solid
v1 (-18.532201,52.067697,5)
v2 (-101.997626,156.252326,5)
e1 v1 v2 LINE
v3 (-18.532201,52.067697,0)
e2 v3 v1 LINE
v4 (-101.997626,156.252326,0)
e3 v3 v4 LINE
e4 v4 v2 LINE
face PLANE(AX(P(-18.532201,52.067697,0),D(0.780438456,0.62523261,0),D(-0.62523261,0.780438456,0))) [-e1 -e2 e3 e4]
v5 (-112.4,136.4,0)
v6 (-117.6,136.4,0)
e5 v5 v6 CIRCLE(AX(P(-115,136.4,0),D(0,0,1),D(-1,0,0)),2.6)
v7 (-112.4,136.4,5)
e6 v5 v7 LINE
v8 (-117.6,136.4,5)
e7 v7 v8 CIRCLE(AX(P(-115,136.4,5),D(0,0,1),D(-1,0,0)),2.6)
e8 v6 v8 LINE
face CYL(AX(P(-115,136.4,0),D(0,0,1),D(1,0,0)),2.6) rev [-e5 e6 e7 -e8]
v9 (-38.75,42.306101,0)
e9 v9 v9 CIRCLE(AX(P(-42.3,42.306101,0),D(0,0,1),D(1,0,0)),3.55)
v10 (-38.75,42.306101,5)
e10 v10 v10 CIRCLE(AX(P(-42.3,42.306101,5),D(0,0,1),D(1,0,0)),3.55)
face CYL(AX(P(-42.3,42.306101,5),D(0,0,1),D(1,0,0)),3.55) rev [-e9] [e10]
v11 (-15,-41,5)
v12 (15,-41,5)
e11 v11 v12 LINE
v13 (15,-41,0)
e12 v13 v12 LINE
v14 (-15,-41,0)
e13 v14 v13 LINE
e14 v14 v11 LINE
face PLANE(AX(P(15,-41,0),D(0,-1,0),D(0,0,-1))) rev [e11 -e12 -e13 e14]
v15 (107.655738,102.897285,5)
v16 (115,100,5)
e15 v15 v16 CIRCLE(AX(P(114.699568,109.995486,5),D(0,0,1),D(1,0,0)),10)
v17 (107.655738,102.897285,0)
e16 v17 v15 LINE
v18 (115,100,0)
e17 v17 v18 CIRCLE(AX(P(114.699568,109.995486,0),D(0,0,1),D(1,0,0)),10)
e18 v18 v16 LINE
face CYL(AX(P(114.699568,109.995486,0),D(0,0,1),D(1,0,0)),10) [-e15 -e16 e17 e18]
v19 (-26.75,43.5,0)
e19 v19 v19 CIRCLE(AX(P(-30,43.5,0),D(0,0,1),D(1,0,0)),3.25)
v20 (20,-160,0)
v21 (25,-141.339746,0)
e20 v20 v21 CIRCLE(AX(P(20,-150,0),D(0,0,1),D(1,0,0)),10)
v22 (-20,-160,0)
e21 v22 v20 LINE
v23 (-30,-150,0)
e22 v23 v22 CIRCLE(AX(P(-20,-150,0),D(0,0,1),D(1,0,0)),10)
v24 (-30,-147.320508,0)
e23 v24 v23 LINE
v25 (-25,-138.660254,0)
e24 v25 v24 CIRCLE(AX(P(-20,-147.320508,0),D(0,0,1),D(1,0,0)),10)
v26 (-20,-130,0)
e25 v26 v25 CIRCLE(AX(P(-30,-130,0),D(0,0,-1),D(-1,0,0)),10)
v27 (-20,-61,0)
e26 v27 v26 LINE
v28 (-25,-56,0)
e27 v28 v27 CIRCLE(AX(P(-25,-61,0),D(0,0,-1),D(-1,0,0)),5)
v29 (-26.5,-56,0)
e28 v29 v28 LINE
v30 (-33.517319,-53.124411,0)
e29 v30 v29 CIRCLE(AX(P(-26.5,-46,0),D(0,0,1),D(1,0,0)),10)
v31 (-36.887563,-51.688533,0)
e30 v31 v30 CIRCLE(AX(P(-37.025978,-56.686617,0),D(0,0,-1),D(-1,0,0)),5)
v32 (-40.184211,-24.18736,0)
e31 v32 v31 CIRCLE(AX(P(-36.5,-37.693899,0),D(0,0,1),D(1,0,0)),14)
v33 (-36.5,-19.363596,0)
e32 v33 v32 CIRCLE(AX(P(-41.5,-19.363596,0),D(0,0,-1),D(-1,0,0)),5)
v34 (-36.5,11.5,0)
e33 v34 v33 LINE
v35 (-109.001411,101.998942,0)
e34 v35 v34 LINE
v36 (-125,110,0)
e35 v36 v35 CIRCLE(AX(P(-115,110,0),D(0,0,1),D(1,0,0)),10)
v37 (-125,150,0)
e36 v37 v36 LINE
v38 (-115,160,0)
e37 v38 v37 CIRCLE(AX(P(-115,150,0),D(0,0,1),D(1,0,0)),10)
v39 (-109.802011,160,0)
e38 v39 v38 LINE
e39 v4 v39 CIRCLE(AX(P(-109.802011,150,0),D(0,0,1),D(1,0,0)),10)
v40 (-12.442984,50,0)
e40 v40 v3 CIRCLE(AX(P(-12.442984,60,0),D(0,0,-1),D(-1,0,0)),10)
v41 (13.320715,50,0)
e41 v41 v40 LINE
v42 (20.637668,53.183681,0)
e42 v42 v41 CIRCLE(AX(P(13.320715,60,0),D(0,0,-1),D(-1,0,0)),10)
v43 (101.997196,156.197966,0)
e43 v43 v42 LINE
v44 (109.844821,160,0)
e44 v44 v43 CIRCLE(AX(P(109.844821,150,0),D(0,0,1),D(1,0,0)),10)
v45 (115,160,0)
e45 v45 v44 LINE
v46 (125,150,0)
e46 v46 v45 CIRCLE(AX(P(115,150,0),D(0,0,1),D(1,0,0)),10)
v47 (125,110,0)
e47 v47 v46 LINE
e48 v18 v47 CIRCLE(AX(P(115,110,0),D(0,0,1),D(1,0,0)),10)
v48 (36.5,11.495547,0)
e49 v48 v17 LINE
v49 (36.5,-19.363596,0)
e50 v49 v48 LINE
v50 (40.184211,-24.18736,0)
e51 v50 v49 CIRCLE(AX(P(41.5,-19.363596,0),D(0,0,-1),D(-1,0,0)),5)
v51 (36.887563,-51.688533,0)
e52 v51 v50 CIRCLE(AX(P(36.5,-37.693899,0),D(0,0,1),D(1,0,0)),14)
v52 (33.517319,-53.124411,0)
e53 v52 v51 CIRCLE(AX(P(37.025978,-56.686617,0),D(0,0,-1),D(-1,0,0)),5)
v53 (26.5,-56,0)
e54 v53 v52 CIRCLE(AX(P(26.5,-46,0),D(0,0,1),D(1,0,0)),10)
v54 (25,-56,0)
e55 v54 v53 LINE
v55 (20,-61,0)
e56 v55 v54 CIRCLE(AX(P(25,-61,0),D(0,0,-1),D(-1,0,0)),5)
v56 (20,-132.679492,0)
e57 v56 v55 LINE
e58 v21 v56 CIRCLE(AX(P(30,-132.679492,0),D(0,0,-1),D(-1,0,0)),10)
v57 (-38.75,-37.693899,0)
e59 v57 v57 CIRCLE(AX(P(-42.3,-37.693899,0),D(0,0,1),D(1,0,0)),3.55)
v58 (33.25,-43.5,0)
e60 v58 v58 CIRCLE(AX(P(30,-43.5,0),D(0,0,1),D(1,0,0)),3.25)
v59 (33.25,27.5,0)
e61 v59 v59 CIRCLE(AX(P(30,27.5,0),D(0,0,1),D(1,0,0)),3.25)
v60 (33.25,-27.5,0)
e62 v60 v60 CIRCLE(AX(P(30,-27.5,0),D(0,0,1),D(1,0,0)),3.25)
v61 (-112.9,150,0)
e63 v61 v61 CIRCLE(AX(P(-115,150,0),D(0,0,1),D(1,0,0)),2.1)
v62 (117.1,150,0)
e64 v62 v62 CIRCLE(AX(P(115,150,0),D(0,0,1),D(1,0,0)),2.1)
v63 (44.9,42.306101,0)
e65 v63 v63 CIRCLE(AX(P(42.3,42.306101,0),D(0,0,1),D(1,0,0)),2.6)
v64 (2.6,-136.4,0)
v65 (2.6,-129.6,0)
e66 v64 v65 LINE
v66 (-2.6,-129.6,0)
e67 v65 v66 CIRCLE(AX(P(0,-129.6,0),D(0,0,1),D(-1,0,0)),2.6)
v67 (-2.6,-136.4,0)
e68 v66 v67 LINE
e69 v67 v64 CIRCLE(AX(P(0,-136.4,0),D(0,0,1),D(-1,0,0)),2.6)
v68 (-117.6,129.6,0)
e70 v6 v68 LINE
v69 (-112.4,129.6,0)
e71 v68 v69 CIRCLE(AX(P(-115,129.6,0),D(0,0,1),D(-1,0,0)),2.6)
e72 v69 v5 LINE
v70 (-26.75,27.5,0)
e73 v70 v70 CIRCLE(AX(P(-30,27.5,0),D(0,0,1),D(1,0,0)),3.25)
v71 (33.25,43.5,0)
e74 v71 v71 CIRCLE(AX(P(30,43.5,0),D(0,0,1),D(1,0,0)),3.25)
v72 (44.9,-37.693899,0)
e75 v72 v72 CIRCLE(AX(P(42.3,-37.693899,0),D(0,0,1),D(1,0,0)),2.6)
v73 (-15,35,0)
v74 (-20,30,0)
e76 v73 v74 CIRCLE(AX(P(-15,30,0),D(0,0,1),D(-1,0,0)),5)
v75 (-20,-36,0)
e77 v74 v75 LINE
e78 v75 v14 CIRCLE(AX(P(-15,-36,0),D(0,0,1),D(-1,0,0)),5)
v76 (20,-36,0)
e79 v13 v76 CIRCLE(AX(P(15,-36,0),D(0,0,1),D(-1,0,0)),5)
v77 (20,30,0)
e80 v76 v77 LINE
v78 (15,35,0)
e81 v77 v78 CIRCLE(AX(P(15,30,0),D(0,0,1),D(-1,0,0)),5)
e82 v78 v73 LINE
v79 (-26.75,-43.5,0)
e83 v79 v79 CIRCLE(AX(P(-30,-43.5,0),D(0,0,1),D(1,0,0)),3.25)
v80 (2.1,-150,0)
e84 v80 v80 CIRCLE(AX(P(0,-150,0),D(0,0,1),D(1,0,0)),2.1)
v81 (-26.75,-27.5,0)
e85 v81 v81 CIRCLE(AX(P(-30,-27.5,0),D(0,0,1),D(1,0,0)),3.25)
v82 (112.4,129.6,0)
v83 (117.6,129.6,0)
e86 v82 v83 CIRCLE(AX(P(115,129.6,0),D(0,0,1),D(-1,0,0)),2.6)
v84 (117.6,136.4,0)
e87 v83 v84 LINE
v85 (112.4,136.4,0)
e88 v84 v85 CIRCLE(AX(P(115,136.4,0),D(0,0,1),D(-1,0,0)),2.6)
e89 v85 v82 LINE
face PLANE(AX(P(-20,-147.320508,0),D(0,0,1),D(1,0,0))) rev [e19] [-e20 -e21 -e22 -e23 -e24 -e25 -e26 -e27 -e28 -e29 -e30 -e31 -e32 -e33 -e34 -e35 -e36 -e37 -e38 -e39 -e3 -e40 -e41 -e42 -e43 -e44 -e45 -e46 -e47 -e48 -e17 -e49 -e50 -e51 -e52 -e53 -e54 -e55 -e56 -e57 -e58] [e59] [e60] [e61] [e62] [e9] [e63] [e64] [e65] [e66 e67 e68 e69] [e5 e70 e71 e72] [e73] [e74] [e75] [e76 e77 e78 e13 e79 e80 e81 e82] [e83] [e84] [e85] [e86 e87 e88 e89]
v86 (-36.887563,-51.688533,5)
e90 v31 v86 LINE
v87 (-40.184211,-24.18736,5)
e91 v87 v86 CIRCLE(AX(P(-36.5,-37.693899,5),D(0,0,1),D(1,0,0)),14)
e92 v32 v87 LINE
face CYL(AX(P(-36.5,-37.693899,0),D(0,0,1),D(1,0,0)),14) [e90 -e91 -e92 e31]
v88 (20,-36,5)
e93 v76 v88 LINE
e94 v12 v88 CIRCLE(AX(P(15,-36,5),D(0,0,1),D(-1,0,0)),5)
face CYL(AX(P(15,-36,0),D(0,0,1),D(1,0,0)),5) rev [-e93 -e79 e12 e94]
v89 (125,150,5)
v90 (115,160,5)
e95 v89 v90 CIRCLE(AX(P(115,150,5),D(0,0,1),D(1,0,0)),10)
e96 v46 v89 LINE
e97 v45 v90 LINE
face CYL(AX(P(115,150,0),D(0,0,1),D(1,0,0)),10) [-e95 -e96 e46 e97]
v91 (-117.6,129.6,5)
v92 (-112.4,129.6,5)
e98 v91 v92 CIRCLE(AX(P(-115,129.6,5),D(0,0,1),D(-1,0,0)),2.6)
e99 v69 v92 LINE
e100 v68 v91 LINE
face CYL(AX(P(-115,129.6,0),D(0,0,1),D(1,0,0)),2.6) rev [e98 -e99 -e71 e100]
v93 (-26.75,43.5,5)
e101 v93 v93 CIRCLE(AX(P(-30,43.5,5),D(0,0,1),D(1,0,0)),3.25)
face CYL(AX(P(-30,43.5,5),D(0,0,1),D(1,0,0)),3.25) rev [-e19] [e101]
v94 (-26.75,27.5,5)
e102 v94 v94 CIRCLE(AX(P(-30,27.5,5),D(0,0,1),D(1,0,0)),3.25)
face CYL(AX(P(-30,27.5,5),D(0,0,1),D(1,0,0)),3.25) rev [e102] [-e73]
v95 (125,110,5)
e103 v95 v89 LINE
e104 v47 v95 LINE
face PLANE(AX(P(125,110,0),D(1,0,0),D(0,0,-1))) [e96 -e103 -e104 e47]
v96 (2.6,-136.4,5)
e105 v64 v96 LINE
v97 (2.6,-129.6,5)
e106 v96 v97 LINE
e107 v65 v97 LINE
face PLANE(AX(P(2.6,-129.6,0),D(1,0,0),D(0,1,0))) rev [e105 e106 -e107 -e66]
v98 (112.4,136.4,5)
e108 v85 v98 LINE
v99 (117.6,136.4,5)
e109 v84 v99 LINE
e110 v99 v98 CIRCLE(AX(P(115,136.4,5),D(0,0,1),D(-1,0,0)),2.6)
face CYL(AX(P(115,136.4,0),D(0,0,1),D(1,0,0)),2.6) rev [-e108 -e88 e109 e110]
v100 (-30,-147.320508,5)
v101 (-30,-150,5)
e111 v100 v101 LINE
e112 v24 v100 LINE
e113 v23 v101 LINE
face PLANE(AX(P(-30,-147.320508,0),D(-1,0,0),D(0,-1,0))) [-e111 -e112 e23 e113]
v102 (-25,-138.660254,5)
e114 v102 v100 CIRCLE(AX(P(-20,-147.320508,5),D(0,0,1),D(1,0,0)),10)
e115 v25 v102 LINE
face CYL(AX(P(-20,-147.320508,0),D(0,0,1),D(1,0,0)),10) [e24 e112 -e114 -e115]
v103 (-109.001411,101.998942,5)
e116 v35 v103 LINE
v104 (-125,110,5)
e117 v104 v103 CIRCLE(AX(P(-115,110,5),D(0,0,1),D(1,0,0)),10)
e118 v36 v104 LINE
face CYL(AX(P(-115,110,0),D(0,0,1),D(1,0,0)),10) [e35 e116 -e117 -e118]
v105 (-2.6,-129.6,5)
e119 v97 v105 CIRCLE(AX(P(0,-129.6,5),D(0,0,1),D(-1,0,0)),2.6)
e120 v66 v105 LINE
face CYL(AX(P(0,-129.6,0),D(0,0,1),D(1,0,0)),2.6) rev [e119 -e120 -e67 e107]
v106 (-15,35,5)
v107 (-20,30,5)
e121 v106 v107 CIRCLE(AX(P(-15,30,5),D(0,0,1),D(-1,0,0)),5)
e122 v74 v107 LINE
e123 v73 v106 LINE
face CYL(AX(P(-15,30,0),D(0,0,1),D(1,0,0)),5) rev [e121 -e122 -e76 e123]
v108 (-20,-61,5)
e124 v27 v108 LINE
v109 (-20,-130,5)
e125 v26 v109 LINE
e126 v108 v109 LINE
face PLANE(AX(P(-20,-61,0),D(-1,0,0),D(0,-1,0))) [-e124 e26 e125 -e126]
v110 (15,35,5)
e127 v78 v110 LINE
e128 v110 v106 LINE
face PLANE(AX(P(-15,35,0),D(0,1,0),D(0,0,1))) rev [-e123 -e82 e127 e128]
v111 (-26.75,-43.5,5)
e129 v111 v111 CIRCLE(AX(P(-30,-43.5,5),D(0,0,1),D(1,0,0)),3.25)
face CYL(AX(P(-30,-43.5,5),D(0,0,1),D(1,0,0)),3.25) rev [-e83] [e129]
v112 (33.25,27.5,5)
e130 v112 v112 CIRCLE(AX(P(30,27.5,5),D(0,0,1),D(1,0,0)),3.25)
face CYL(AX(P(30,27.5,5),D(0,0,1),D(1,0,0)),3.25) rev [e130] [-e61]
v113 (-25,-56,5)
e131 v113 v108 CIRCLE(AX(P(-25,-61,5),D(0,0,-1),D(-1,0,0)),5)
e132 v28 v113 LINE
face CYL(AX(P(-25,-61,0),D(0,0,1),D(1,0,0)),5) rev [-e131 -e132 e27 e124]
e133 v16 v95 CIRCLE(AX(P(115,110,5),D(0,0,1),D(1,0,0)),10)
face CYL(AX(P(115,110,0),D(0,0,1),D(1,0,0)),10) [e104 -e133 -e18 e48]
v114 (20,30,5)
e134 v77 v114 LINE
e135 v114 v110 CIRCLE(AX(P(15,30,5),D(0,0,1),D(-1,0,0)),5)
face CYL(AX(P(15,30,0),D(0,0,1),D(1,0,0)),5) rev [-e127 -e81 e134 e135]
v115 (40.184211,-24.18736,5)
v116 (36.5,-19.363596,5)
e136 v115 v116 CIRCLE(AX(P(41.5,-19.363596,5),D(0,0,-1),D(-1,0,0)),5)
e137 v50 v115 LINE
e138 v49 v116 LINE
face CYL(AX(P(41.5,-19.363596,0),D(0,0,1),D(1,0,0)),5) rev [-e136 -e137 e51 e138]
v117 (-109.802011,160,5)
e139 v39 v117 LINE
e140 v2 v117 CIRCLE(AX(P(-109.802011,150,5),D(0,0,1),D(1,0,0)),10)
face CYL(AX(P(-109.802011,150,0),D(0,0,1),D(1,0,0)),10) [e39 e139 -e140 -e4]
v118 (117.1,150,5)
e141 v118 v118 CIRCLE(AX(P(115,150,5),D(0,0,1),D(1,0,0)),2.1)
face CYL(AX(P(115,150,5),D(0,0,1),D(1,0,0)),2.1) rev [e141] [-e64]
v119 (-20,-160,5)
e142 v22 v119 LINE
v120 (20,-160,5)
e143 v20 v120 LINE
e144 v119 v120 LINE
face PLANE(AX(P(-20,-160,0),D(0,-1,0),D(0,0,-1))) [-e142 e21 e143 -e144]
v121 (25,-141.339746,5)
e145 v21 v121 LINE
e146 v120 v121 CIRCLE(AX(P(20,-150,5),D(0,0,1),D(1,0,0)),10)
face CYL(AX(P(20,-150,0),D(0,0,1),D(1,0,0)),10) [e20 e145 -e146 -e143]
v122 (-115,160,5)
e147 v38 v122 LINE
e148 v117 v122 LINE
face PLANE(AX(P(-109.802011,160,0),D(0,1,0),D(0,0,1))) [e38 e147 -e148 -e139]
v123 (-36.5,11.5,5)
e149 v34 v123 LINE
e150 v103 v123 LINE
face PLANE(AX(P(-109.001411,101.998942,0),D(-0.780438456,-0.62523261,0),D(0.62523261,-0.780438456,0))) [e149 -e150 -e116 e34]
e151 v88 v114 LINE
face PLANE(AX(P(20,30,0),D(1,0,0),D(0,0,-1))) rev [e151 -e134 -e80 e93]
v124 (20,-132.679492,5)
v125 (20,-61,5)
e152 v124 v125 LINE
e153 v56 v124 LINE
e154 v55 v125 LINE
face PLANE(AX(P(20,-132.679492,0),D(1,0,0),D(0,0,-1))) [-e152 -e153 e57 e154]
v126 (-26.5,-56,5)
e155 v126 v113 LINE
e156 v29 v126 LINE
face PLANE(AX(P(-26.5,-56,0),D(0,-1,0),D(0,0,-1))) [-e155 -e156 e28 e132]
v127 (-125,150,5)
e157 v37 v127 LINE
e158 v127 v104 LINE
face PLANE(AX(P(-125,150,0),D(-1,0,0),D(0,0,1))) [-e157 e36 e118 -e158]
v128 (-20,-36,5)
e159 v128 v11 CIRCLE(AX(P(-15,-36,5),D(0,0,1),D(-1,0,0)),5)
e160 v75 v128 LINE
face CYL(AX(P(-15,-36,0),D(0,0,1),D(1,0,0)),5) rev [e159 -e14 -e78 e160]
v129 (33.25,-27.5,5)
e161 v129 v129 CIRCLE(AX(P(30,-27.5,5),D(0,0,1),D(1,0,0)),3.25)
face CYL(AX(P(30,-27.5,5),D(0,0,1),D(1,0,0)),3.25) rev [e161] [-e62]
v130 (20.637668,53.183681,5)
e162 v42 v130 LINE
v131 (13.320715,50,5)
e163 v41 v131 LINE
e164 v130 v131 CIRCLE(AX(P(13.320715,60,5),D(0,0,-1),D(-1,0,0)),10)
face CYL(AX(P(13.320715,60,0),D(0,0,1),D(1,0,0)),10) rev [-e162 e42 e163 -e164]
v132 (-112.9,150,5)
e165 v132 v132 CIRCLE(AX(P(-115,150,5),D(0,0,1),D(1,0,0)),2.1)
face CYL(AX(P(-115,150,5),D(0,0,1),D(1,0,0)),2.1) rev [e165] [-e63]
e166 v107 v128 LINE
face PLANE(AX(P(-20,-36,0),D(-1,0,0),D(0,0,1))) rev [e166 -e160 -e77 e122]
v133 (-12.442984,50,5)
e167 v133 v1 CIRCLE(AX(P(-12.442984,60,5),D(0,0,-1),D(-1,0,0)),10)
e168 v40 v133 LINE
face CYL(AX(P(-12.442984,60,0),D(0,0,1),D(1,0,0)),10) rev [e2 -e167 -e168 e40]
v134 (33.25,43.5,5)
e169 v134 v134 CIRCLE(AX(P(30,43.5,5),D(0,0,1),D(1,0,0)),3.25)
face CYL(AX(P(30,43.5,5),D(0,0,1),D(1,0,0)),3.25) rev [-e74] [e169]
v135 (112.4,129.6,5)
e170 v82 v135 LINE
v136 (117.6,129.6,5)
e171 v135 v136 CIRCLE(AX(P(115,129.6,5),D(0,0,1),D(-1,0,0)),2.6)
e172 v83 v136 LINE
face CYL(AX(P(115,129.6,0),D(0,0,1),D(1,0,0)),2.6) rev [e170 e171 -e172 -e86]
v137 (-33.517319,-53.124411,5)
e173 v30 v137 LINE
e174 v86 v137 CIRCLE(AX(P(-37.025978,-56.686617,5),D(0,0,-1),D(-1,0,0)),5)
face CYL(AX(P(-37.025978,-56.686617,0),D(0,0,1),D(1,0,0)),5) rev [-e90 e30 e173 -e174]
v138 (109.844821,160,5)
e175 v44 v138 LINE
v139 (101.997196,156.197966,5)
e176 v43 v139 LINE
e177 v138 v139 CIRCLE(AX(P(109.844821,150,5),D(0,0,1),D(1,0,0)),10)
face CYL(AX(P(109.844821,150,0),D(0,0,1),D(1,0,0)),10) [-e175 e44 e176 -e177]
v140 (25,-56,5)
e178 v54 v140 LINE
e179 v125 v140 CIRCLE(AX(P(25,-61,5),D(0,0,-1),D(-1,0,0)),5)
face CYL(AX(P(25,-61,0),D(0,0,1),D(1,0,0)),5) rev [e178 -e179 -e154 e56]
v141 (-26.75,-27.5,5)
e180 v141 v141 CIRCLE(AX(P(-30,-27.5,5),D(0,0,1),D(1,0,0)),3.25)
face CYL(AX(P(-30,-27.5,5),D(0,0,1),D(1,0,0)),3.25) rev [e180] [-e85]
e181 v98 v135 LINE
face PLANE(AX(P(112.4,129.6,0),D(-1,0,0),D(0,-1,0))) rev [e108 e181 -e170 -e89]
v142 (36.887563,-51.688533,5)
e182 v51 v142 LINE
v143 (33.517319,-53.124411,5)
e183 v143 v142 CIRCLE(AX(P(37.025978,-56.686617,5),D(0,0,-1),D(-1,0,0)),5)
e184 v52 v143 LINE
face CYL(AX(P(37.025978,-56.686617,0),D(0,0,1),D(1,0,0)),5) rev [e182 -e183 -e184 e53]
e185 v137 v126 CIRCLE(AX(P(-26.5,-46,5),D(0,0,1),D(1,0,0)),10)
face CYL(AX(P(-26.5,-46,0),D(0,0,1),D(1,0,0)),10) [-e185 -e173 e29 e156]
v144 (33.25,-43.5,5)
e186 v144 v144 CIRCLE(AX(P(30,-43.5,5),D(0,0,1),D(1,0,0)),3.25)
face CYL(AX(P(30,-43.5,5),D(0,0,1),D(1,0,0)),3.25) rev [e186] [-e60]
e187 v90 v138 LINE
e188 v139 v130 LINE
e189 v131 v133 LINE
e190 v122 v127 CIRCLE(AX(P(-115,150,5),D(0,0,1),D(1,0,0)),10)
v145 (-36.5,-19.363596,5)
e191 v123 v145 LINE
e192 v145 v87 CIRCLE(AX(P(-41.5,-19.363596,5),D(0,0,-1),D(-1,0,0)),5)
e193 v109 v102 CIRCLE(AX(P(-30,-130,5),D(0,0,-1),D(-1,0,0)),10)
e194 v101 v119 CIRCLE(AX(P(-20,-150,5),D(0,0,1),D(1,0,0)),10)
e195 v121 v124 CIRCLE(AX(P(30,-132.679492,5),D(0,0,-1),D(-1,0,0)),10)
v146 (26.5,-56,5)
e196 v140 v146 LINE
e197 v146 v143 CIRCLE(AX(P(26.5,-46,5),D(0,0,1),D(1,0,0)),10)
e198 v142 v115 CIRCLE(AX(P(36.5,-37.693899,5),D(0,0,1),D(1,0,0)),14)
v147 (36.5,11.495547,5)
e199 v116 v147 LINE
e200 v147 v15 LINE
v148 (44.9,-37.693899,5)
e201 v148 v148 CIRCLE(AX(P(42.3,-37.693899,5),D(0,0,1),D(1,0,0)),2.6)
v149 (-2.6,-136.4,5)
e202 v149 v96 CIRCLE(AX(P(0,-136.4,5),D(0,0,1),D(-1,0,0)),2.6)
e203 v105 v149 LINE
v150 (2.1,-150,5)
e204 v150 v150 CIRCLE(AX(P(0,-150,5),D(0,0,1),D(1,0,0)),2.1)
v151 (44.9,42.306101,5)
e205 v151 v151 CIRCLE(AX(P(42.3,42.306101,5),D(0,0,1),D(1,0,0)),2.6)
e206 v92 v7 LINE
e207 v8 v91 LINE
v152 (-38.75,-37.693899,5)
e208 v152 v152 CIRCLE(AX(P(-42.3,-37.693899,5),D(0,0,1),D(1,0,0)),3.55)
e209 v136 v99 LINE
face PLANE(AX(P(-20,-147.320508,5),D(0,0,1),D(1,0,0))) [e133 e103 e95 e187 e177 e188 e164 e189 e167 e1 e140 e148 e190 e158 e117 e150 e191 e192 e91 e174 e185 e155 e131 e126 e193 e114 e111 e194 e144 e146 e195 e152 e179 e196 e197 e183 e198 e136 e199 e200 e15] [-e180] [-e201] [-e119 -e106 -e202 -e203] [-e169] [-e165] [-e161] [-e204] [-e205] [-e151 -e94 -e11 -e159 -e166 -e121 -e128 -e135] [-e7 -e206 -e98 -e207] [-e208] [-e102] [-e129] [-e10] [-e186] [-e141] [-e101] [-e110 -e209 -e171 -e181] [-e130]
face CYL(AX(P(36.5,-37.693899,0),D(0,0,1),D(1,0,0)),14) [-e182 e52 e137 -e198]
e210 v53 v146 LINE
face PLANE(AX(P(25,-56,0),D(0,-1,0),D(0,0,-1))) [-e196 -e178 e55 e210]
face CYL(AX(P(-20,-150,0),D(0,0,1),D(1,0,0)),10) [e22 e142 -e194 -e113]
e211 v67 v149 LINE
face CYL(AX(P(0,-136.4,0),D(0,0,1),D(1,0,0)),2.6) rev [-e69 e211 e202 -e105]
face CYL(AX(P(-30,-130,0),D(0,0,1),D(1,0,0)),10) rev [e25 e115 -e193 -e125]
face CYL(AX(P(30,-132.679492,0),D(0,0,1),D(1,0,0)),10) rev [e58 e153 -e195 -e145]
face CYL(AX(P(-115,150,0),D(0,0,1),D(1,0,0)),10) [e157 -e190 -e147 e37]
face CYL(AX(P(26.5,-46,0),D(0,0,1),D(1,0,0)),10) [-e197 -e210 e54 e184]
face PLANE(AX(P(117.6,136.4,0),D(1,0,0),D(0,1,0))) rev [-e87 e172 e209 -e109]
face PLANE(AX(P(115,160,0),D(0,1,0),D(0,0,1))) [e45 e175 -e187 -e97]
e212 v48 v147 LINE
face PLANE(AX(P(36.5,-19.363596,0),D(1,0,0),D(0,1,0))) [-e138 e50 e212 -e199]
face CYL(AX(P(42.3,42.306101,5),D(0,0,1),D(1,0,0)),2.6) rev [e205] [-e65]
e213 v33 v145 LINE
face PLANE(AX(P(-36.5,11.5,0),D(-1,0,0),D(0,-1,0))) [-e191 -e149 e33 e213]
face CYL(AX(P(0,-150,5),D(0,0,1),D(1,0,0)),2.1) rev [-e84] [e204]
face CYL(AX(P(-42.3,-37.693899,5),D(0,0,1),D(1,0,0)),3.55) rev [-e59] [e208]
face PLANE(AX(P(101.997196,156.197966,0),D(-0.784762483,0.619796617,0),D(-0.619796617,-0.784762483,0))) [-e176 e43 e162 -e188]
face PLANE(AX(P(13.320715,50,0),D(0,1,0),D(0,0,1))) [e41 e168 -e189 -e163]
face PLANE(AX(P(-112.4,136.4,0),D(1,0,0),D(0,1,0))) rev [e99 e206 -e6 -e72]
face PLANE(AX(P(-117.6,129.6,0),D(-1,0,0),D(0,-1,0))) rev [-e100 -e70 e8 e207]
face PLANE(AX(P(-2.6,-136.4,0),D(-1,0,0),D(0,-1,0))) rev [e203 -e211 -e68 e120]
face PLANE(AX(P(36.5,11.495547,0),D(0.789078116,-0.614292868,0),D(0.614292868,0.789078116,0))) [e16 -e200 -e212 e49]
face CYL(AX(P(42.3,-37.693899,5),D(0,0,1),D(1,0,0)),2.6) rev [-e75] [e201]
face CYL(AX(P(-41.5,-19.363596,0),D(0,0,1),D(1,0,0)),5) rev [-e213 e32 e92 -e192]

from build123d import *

# Parameters (mm, degrees)
BASE_FLANGE1_DEPTH         = 5
F_5_2_5_2_DIAMETER_HOLE1_D = 5.2
F_7_1_7_1_DIAMETER_HOLE1_D = 7.1
F_6_5_6_5_DIAMETER_HOLE1_D = 6.5
F_4_2_4_2_DIAMETER_HOLE1_D = 4.2


# Sheet-metal steps are written as plain solids
with BuildPart() as part:
    # Sketch7 → Base-Flange1 (new body)
    with BuildSketch(Plane.XY.offset(5)):
        with BuildLine():
            Line((-30, -147.320508076), (-30, -150))
            ThreePointArc((-30, -150), (-27.071067812, -157.071067812), (-20, -160))
            Line((-20, -160), (20, -160))
            ThreePointArc((20, -160), (29.659258263, -152.588190451), (25, -141.339745962))
            ThreePointArc((25, -141.339745962), (21.339745962, -137.679491924), (20, -132.679491924))
            Line((20, -132.679491924), (20, -61))
            ThreePointArc((20, -61), (21.464466094, -57.464466094), (25, -56))
            Line((25, -56), (26.5, -56))
            ThreePointArc((26.5, -56), (30.291825885, -55.253218708), (33.517318844, -53.124411291))
            ThreePointArc((33.517318844, -53.124411291), (35.066201479, -52.086695747), (36.887562932, -51.688533184))
            ThreePointArc((36.887562932, -51.688533184), (50.4004845, -39.360191171), (40.184210526, -24.187359787))
            ThreePointArc((40.184210526, -24.187359787), (37.526402929, -22.398480791), (36.5, -19.363595898))
            Line((36.5, -19.363595898), (36.5, 11.495546893))
            Line((36.5, 11.495546893), (107.655738061, 102.897284867))
            ThreePointArc((107.655738061, 102.897284867), (111.029837924, 100.693170117), (115, 100))
            ThreePointArc((115, 100), (122.071067812, 102.928932188), (125, 110))
            Line((125, 110), (125, 150))
            ThreePointArc((125, 150), (122.071067812, 157.071067812), (115, 160))
            Line((115, 160), (109.8448211, 160))
            ThreePointArc((109.8448211, 160), (105.484755829, 158.999435028), (101.997196274, 156.197966166))
            Line((101.997196274, 156.197966166), (20.637667976, 53.183681001))
            ThreePointArc((20.637667976, 53.183681001), (17.310502968, 50.830398319), (13.320715378, 50))
            Line((13.320715378, 50), (-12.442983516, 50))
            ThreePointArc((-12.442983516, 50), (-15.658335228, 50.531023637), (-18.532201388, 52.067697326))
            Line((-18.532201388, 52.067697326), (-101.997626249, 156.252326096))
            ThreePointArc((-101.997626249, 156.252326096), (-105.473226973, 159.014523308), (-109.802010811, 160))
            Line((-109.802010811, 160), (-115, 160))
            ThreePointArc((-115, 160), (-122.071067812, 157.071067812), (-125, 150))
            Line((-125, 150), (-125, 110))
            ThreePointArc((-125, 110), (-119.472924821, 101.056122567), (-109.001411291, 101.998941726))
            Line((-109.001411291, 101.998941726), (-36.5, 11.5))
            Line((-36.5, 11.5), (-36.5, -19.363595898))
            ThreePointArc((-36.5, -19.363595898), (-37.526402929, -22.398480791), (-40.184210526, -24.187359787))
            ThreePointArc((-40.184210526, -24.187359787), (-50.4004845, -39.360191171), (-36.887562932, -51.688533184))
            ThreePointArc((-36.887562932, -51.688533184), (-35.066201479, -52.086695747), (-33.517318844, -53.124411291))
            ThreePointArc((-33.517318844, -53.124411291), (-30.291825885, -55.253218708), (-26.5, -56))
            Line((-26.5, -56), (-25, -56))
            ThreePointArc((-25, -56), (-21.464466094, -57.464466094), (-20, -61))
            Line((-20, -61), (-20, -130))
            ThreePointArc((-20, -130), (-21.339745962, -135), (-25, -138.660254038))
            ThreePointArc((-25, -138.660254038), (-28.660254038, -142.320508076), (-30, -147.320508076))
        make_face()
        with BuildLine():
            Line((117.6, 136.4), (117.6, 129.6))
            ThreePointArc((117.6, 129.6), (115, 127), (112.4, 129.6))
            Line((112.4, 129.6), (112.4, 136.4))
            ThreePointArc((112.4, 136.4), (115, 139), (117.6, 136.4))
        make_face(mode=Mode.SUBTRACT)
        with BuildLine():
            Line((-112.4, 136.4), (-112.4, 129.6))
            ThreePointArc((-112.4, 129.6), (-115, 127), (-117.6, 129.6))
            Line((-117.6, 129.6), (-117.6, 136.4))
            ThreePointArc((-117.6, 136.4), (-115, 139), (-112.4, 136.4))
        make_face(mode=Mode.SUBTRACT)
        with BuildLine():
            Line((2.6, -129.6), (2.6, -136.4))
            ThreePointArc((2.6, -136.4), (0, -139), (-2.6, -136.4))
            Line((-2.6, -136.4), (-2.6, -129.6))
            ThreePointArc((-2.6, -129.6), (0, -127), (2.6, -129.6))
        make_face(mode=Mode.SUBTRACT)
        with BuildLine():
            Line((-20, -36), (-20, 30))
            ThreePointArc((-20, 30), (-18.535533906, 33.535533906), (-15, 35))
            Line((-15, 35), (15, 35))
            ThreePointArc((15, 35), (18.535533906, 33.535533906), (20, 30))
            Line((20, 30), (20, -36))
            ThreePointArc((20, -36), (18.535533906, -39.535533906), (15, -41))
            Line((15, -41), (-15, -41))
            ThreePointArc((-15, -41), (-18.535533906, -39.535533906), (-20, -36))
        make_face(mode=Mode.SUBTRACT)
    extrude(amount=-BASE_FLANGE1_DEPTH)

    # Ø5.2 (5.2) Diameter Hole1 (through all)
    with Locations(Plane.XY.offset(5)):
        with Locations((42.3, -37.693898678), (42.3, 42.306101322)):
            Hole(F_5_2_5_2_DIAMETER_HOLE1_D / 2)

    # Ø7.1 (7.1) Diameter Hole1 (through all)
    with Locations(Plane.XY.offset(5)):
        with Locations((-42.3, -37.693898678), (-42.3, 42.306101322)):
            Hole(F_7_1_7_1_DIAMETER_HOLE1_D / 2)

    # Ø6.5 (6.5) Diameter Hole1 (through all)
    with Locations(Plane.XY.offset(5)):
        with Locations((-30, -43.5), (-30, 43.5), (-30, -27.5), (-30, 27.5), (30, -43.5), (30, -27.5), (30, 27.5), (30, 43.5)):
            Hole(F_6_5_6_5_DIAMETER_HOLE1_D / 2)

    # Ø4.2 (4.2) Diameter Hole1 (through all)
    with Locations(Plane.XY.offset(5)):
        with Locations((0, -150), (-115, 150), (115, 150)):
            Hole(F_4_2_4_2_DIAMETER_HOLE1_D / 2)


solid = part.part
